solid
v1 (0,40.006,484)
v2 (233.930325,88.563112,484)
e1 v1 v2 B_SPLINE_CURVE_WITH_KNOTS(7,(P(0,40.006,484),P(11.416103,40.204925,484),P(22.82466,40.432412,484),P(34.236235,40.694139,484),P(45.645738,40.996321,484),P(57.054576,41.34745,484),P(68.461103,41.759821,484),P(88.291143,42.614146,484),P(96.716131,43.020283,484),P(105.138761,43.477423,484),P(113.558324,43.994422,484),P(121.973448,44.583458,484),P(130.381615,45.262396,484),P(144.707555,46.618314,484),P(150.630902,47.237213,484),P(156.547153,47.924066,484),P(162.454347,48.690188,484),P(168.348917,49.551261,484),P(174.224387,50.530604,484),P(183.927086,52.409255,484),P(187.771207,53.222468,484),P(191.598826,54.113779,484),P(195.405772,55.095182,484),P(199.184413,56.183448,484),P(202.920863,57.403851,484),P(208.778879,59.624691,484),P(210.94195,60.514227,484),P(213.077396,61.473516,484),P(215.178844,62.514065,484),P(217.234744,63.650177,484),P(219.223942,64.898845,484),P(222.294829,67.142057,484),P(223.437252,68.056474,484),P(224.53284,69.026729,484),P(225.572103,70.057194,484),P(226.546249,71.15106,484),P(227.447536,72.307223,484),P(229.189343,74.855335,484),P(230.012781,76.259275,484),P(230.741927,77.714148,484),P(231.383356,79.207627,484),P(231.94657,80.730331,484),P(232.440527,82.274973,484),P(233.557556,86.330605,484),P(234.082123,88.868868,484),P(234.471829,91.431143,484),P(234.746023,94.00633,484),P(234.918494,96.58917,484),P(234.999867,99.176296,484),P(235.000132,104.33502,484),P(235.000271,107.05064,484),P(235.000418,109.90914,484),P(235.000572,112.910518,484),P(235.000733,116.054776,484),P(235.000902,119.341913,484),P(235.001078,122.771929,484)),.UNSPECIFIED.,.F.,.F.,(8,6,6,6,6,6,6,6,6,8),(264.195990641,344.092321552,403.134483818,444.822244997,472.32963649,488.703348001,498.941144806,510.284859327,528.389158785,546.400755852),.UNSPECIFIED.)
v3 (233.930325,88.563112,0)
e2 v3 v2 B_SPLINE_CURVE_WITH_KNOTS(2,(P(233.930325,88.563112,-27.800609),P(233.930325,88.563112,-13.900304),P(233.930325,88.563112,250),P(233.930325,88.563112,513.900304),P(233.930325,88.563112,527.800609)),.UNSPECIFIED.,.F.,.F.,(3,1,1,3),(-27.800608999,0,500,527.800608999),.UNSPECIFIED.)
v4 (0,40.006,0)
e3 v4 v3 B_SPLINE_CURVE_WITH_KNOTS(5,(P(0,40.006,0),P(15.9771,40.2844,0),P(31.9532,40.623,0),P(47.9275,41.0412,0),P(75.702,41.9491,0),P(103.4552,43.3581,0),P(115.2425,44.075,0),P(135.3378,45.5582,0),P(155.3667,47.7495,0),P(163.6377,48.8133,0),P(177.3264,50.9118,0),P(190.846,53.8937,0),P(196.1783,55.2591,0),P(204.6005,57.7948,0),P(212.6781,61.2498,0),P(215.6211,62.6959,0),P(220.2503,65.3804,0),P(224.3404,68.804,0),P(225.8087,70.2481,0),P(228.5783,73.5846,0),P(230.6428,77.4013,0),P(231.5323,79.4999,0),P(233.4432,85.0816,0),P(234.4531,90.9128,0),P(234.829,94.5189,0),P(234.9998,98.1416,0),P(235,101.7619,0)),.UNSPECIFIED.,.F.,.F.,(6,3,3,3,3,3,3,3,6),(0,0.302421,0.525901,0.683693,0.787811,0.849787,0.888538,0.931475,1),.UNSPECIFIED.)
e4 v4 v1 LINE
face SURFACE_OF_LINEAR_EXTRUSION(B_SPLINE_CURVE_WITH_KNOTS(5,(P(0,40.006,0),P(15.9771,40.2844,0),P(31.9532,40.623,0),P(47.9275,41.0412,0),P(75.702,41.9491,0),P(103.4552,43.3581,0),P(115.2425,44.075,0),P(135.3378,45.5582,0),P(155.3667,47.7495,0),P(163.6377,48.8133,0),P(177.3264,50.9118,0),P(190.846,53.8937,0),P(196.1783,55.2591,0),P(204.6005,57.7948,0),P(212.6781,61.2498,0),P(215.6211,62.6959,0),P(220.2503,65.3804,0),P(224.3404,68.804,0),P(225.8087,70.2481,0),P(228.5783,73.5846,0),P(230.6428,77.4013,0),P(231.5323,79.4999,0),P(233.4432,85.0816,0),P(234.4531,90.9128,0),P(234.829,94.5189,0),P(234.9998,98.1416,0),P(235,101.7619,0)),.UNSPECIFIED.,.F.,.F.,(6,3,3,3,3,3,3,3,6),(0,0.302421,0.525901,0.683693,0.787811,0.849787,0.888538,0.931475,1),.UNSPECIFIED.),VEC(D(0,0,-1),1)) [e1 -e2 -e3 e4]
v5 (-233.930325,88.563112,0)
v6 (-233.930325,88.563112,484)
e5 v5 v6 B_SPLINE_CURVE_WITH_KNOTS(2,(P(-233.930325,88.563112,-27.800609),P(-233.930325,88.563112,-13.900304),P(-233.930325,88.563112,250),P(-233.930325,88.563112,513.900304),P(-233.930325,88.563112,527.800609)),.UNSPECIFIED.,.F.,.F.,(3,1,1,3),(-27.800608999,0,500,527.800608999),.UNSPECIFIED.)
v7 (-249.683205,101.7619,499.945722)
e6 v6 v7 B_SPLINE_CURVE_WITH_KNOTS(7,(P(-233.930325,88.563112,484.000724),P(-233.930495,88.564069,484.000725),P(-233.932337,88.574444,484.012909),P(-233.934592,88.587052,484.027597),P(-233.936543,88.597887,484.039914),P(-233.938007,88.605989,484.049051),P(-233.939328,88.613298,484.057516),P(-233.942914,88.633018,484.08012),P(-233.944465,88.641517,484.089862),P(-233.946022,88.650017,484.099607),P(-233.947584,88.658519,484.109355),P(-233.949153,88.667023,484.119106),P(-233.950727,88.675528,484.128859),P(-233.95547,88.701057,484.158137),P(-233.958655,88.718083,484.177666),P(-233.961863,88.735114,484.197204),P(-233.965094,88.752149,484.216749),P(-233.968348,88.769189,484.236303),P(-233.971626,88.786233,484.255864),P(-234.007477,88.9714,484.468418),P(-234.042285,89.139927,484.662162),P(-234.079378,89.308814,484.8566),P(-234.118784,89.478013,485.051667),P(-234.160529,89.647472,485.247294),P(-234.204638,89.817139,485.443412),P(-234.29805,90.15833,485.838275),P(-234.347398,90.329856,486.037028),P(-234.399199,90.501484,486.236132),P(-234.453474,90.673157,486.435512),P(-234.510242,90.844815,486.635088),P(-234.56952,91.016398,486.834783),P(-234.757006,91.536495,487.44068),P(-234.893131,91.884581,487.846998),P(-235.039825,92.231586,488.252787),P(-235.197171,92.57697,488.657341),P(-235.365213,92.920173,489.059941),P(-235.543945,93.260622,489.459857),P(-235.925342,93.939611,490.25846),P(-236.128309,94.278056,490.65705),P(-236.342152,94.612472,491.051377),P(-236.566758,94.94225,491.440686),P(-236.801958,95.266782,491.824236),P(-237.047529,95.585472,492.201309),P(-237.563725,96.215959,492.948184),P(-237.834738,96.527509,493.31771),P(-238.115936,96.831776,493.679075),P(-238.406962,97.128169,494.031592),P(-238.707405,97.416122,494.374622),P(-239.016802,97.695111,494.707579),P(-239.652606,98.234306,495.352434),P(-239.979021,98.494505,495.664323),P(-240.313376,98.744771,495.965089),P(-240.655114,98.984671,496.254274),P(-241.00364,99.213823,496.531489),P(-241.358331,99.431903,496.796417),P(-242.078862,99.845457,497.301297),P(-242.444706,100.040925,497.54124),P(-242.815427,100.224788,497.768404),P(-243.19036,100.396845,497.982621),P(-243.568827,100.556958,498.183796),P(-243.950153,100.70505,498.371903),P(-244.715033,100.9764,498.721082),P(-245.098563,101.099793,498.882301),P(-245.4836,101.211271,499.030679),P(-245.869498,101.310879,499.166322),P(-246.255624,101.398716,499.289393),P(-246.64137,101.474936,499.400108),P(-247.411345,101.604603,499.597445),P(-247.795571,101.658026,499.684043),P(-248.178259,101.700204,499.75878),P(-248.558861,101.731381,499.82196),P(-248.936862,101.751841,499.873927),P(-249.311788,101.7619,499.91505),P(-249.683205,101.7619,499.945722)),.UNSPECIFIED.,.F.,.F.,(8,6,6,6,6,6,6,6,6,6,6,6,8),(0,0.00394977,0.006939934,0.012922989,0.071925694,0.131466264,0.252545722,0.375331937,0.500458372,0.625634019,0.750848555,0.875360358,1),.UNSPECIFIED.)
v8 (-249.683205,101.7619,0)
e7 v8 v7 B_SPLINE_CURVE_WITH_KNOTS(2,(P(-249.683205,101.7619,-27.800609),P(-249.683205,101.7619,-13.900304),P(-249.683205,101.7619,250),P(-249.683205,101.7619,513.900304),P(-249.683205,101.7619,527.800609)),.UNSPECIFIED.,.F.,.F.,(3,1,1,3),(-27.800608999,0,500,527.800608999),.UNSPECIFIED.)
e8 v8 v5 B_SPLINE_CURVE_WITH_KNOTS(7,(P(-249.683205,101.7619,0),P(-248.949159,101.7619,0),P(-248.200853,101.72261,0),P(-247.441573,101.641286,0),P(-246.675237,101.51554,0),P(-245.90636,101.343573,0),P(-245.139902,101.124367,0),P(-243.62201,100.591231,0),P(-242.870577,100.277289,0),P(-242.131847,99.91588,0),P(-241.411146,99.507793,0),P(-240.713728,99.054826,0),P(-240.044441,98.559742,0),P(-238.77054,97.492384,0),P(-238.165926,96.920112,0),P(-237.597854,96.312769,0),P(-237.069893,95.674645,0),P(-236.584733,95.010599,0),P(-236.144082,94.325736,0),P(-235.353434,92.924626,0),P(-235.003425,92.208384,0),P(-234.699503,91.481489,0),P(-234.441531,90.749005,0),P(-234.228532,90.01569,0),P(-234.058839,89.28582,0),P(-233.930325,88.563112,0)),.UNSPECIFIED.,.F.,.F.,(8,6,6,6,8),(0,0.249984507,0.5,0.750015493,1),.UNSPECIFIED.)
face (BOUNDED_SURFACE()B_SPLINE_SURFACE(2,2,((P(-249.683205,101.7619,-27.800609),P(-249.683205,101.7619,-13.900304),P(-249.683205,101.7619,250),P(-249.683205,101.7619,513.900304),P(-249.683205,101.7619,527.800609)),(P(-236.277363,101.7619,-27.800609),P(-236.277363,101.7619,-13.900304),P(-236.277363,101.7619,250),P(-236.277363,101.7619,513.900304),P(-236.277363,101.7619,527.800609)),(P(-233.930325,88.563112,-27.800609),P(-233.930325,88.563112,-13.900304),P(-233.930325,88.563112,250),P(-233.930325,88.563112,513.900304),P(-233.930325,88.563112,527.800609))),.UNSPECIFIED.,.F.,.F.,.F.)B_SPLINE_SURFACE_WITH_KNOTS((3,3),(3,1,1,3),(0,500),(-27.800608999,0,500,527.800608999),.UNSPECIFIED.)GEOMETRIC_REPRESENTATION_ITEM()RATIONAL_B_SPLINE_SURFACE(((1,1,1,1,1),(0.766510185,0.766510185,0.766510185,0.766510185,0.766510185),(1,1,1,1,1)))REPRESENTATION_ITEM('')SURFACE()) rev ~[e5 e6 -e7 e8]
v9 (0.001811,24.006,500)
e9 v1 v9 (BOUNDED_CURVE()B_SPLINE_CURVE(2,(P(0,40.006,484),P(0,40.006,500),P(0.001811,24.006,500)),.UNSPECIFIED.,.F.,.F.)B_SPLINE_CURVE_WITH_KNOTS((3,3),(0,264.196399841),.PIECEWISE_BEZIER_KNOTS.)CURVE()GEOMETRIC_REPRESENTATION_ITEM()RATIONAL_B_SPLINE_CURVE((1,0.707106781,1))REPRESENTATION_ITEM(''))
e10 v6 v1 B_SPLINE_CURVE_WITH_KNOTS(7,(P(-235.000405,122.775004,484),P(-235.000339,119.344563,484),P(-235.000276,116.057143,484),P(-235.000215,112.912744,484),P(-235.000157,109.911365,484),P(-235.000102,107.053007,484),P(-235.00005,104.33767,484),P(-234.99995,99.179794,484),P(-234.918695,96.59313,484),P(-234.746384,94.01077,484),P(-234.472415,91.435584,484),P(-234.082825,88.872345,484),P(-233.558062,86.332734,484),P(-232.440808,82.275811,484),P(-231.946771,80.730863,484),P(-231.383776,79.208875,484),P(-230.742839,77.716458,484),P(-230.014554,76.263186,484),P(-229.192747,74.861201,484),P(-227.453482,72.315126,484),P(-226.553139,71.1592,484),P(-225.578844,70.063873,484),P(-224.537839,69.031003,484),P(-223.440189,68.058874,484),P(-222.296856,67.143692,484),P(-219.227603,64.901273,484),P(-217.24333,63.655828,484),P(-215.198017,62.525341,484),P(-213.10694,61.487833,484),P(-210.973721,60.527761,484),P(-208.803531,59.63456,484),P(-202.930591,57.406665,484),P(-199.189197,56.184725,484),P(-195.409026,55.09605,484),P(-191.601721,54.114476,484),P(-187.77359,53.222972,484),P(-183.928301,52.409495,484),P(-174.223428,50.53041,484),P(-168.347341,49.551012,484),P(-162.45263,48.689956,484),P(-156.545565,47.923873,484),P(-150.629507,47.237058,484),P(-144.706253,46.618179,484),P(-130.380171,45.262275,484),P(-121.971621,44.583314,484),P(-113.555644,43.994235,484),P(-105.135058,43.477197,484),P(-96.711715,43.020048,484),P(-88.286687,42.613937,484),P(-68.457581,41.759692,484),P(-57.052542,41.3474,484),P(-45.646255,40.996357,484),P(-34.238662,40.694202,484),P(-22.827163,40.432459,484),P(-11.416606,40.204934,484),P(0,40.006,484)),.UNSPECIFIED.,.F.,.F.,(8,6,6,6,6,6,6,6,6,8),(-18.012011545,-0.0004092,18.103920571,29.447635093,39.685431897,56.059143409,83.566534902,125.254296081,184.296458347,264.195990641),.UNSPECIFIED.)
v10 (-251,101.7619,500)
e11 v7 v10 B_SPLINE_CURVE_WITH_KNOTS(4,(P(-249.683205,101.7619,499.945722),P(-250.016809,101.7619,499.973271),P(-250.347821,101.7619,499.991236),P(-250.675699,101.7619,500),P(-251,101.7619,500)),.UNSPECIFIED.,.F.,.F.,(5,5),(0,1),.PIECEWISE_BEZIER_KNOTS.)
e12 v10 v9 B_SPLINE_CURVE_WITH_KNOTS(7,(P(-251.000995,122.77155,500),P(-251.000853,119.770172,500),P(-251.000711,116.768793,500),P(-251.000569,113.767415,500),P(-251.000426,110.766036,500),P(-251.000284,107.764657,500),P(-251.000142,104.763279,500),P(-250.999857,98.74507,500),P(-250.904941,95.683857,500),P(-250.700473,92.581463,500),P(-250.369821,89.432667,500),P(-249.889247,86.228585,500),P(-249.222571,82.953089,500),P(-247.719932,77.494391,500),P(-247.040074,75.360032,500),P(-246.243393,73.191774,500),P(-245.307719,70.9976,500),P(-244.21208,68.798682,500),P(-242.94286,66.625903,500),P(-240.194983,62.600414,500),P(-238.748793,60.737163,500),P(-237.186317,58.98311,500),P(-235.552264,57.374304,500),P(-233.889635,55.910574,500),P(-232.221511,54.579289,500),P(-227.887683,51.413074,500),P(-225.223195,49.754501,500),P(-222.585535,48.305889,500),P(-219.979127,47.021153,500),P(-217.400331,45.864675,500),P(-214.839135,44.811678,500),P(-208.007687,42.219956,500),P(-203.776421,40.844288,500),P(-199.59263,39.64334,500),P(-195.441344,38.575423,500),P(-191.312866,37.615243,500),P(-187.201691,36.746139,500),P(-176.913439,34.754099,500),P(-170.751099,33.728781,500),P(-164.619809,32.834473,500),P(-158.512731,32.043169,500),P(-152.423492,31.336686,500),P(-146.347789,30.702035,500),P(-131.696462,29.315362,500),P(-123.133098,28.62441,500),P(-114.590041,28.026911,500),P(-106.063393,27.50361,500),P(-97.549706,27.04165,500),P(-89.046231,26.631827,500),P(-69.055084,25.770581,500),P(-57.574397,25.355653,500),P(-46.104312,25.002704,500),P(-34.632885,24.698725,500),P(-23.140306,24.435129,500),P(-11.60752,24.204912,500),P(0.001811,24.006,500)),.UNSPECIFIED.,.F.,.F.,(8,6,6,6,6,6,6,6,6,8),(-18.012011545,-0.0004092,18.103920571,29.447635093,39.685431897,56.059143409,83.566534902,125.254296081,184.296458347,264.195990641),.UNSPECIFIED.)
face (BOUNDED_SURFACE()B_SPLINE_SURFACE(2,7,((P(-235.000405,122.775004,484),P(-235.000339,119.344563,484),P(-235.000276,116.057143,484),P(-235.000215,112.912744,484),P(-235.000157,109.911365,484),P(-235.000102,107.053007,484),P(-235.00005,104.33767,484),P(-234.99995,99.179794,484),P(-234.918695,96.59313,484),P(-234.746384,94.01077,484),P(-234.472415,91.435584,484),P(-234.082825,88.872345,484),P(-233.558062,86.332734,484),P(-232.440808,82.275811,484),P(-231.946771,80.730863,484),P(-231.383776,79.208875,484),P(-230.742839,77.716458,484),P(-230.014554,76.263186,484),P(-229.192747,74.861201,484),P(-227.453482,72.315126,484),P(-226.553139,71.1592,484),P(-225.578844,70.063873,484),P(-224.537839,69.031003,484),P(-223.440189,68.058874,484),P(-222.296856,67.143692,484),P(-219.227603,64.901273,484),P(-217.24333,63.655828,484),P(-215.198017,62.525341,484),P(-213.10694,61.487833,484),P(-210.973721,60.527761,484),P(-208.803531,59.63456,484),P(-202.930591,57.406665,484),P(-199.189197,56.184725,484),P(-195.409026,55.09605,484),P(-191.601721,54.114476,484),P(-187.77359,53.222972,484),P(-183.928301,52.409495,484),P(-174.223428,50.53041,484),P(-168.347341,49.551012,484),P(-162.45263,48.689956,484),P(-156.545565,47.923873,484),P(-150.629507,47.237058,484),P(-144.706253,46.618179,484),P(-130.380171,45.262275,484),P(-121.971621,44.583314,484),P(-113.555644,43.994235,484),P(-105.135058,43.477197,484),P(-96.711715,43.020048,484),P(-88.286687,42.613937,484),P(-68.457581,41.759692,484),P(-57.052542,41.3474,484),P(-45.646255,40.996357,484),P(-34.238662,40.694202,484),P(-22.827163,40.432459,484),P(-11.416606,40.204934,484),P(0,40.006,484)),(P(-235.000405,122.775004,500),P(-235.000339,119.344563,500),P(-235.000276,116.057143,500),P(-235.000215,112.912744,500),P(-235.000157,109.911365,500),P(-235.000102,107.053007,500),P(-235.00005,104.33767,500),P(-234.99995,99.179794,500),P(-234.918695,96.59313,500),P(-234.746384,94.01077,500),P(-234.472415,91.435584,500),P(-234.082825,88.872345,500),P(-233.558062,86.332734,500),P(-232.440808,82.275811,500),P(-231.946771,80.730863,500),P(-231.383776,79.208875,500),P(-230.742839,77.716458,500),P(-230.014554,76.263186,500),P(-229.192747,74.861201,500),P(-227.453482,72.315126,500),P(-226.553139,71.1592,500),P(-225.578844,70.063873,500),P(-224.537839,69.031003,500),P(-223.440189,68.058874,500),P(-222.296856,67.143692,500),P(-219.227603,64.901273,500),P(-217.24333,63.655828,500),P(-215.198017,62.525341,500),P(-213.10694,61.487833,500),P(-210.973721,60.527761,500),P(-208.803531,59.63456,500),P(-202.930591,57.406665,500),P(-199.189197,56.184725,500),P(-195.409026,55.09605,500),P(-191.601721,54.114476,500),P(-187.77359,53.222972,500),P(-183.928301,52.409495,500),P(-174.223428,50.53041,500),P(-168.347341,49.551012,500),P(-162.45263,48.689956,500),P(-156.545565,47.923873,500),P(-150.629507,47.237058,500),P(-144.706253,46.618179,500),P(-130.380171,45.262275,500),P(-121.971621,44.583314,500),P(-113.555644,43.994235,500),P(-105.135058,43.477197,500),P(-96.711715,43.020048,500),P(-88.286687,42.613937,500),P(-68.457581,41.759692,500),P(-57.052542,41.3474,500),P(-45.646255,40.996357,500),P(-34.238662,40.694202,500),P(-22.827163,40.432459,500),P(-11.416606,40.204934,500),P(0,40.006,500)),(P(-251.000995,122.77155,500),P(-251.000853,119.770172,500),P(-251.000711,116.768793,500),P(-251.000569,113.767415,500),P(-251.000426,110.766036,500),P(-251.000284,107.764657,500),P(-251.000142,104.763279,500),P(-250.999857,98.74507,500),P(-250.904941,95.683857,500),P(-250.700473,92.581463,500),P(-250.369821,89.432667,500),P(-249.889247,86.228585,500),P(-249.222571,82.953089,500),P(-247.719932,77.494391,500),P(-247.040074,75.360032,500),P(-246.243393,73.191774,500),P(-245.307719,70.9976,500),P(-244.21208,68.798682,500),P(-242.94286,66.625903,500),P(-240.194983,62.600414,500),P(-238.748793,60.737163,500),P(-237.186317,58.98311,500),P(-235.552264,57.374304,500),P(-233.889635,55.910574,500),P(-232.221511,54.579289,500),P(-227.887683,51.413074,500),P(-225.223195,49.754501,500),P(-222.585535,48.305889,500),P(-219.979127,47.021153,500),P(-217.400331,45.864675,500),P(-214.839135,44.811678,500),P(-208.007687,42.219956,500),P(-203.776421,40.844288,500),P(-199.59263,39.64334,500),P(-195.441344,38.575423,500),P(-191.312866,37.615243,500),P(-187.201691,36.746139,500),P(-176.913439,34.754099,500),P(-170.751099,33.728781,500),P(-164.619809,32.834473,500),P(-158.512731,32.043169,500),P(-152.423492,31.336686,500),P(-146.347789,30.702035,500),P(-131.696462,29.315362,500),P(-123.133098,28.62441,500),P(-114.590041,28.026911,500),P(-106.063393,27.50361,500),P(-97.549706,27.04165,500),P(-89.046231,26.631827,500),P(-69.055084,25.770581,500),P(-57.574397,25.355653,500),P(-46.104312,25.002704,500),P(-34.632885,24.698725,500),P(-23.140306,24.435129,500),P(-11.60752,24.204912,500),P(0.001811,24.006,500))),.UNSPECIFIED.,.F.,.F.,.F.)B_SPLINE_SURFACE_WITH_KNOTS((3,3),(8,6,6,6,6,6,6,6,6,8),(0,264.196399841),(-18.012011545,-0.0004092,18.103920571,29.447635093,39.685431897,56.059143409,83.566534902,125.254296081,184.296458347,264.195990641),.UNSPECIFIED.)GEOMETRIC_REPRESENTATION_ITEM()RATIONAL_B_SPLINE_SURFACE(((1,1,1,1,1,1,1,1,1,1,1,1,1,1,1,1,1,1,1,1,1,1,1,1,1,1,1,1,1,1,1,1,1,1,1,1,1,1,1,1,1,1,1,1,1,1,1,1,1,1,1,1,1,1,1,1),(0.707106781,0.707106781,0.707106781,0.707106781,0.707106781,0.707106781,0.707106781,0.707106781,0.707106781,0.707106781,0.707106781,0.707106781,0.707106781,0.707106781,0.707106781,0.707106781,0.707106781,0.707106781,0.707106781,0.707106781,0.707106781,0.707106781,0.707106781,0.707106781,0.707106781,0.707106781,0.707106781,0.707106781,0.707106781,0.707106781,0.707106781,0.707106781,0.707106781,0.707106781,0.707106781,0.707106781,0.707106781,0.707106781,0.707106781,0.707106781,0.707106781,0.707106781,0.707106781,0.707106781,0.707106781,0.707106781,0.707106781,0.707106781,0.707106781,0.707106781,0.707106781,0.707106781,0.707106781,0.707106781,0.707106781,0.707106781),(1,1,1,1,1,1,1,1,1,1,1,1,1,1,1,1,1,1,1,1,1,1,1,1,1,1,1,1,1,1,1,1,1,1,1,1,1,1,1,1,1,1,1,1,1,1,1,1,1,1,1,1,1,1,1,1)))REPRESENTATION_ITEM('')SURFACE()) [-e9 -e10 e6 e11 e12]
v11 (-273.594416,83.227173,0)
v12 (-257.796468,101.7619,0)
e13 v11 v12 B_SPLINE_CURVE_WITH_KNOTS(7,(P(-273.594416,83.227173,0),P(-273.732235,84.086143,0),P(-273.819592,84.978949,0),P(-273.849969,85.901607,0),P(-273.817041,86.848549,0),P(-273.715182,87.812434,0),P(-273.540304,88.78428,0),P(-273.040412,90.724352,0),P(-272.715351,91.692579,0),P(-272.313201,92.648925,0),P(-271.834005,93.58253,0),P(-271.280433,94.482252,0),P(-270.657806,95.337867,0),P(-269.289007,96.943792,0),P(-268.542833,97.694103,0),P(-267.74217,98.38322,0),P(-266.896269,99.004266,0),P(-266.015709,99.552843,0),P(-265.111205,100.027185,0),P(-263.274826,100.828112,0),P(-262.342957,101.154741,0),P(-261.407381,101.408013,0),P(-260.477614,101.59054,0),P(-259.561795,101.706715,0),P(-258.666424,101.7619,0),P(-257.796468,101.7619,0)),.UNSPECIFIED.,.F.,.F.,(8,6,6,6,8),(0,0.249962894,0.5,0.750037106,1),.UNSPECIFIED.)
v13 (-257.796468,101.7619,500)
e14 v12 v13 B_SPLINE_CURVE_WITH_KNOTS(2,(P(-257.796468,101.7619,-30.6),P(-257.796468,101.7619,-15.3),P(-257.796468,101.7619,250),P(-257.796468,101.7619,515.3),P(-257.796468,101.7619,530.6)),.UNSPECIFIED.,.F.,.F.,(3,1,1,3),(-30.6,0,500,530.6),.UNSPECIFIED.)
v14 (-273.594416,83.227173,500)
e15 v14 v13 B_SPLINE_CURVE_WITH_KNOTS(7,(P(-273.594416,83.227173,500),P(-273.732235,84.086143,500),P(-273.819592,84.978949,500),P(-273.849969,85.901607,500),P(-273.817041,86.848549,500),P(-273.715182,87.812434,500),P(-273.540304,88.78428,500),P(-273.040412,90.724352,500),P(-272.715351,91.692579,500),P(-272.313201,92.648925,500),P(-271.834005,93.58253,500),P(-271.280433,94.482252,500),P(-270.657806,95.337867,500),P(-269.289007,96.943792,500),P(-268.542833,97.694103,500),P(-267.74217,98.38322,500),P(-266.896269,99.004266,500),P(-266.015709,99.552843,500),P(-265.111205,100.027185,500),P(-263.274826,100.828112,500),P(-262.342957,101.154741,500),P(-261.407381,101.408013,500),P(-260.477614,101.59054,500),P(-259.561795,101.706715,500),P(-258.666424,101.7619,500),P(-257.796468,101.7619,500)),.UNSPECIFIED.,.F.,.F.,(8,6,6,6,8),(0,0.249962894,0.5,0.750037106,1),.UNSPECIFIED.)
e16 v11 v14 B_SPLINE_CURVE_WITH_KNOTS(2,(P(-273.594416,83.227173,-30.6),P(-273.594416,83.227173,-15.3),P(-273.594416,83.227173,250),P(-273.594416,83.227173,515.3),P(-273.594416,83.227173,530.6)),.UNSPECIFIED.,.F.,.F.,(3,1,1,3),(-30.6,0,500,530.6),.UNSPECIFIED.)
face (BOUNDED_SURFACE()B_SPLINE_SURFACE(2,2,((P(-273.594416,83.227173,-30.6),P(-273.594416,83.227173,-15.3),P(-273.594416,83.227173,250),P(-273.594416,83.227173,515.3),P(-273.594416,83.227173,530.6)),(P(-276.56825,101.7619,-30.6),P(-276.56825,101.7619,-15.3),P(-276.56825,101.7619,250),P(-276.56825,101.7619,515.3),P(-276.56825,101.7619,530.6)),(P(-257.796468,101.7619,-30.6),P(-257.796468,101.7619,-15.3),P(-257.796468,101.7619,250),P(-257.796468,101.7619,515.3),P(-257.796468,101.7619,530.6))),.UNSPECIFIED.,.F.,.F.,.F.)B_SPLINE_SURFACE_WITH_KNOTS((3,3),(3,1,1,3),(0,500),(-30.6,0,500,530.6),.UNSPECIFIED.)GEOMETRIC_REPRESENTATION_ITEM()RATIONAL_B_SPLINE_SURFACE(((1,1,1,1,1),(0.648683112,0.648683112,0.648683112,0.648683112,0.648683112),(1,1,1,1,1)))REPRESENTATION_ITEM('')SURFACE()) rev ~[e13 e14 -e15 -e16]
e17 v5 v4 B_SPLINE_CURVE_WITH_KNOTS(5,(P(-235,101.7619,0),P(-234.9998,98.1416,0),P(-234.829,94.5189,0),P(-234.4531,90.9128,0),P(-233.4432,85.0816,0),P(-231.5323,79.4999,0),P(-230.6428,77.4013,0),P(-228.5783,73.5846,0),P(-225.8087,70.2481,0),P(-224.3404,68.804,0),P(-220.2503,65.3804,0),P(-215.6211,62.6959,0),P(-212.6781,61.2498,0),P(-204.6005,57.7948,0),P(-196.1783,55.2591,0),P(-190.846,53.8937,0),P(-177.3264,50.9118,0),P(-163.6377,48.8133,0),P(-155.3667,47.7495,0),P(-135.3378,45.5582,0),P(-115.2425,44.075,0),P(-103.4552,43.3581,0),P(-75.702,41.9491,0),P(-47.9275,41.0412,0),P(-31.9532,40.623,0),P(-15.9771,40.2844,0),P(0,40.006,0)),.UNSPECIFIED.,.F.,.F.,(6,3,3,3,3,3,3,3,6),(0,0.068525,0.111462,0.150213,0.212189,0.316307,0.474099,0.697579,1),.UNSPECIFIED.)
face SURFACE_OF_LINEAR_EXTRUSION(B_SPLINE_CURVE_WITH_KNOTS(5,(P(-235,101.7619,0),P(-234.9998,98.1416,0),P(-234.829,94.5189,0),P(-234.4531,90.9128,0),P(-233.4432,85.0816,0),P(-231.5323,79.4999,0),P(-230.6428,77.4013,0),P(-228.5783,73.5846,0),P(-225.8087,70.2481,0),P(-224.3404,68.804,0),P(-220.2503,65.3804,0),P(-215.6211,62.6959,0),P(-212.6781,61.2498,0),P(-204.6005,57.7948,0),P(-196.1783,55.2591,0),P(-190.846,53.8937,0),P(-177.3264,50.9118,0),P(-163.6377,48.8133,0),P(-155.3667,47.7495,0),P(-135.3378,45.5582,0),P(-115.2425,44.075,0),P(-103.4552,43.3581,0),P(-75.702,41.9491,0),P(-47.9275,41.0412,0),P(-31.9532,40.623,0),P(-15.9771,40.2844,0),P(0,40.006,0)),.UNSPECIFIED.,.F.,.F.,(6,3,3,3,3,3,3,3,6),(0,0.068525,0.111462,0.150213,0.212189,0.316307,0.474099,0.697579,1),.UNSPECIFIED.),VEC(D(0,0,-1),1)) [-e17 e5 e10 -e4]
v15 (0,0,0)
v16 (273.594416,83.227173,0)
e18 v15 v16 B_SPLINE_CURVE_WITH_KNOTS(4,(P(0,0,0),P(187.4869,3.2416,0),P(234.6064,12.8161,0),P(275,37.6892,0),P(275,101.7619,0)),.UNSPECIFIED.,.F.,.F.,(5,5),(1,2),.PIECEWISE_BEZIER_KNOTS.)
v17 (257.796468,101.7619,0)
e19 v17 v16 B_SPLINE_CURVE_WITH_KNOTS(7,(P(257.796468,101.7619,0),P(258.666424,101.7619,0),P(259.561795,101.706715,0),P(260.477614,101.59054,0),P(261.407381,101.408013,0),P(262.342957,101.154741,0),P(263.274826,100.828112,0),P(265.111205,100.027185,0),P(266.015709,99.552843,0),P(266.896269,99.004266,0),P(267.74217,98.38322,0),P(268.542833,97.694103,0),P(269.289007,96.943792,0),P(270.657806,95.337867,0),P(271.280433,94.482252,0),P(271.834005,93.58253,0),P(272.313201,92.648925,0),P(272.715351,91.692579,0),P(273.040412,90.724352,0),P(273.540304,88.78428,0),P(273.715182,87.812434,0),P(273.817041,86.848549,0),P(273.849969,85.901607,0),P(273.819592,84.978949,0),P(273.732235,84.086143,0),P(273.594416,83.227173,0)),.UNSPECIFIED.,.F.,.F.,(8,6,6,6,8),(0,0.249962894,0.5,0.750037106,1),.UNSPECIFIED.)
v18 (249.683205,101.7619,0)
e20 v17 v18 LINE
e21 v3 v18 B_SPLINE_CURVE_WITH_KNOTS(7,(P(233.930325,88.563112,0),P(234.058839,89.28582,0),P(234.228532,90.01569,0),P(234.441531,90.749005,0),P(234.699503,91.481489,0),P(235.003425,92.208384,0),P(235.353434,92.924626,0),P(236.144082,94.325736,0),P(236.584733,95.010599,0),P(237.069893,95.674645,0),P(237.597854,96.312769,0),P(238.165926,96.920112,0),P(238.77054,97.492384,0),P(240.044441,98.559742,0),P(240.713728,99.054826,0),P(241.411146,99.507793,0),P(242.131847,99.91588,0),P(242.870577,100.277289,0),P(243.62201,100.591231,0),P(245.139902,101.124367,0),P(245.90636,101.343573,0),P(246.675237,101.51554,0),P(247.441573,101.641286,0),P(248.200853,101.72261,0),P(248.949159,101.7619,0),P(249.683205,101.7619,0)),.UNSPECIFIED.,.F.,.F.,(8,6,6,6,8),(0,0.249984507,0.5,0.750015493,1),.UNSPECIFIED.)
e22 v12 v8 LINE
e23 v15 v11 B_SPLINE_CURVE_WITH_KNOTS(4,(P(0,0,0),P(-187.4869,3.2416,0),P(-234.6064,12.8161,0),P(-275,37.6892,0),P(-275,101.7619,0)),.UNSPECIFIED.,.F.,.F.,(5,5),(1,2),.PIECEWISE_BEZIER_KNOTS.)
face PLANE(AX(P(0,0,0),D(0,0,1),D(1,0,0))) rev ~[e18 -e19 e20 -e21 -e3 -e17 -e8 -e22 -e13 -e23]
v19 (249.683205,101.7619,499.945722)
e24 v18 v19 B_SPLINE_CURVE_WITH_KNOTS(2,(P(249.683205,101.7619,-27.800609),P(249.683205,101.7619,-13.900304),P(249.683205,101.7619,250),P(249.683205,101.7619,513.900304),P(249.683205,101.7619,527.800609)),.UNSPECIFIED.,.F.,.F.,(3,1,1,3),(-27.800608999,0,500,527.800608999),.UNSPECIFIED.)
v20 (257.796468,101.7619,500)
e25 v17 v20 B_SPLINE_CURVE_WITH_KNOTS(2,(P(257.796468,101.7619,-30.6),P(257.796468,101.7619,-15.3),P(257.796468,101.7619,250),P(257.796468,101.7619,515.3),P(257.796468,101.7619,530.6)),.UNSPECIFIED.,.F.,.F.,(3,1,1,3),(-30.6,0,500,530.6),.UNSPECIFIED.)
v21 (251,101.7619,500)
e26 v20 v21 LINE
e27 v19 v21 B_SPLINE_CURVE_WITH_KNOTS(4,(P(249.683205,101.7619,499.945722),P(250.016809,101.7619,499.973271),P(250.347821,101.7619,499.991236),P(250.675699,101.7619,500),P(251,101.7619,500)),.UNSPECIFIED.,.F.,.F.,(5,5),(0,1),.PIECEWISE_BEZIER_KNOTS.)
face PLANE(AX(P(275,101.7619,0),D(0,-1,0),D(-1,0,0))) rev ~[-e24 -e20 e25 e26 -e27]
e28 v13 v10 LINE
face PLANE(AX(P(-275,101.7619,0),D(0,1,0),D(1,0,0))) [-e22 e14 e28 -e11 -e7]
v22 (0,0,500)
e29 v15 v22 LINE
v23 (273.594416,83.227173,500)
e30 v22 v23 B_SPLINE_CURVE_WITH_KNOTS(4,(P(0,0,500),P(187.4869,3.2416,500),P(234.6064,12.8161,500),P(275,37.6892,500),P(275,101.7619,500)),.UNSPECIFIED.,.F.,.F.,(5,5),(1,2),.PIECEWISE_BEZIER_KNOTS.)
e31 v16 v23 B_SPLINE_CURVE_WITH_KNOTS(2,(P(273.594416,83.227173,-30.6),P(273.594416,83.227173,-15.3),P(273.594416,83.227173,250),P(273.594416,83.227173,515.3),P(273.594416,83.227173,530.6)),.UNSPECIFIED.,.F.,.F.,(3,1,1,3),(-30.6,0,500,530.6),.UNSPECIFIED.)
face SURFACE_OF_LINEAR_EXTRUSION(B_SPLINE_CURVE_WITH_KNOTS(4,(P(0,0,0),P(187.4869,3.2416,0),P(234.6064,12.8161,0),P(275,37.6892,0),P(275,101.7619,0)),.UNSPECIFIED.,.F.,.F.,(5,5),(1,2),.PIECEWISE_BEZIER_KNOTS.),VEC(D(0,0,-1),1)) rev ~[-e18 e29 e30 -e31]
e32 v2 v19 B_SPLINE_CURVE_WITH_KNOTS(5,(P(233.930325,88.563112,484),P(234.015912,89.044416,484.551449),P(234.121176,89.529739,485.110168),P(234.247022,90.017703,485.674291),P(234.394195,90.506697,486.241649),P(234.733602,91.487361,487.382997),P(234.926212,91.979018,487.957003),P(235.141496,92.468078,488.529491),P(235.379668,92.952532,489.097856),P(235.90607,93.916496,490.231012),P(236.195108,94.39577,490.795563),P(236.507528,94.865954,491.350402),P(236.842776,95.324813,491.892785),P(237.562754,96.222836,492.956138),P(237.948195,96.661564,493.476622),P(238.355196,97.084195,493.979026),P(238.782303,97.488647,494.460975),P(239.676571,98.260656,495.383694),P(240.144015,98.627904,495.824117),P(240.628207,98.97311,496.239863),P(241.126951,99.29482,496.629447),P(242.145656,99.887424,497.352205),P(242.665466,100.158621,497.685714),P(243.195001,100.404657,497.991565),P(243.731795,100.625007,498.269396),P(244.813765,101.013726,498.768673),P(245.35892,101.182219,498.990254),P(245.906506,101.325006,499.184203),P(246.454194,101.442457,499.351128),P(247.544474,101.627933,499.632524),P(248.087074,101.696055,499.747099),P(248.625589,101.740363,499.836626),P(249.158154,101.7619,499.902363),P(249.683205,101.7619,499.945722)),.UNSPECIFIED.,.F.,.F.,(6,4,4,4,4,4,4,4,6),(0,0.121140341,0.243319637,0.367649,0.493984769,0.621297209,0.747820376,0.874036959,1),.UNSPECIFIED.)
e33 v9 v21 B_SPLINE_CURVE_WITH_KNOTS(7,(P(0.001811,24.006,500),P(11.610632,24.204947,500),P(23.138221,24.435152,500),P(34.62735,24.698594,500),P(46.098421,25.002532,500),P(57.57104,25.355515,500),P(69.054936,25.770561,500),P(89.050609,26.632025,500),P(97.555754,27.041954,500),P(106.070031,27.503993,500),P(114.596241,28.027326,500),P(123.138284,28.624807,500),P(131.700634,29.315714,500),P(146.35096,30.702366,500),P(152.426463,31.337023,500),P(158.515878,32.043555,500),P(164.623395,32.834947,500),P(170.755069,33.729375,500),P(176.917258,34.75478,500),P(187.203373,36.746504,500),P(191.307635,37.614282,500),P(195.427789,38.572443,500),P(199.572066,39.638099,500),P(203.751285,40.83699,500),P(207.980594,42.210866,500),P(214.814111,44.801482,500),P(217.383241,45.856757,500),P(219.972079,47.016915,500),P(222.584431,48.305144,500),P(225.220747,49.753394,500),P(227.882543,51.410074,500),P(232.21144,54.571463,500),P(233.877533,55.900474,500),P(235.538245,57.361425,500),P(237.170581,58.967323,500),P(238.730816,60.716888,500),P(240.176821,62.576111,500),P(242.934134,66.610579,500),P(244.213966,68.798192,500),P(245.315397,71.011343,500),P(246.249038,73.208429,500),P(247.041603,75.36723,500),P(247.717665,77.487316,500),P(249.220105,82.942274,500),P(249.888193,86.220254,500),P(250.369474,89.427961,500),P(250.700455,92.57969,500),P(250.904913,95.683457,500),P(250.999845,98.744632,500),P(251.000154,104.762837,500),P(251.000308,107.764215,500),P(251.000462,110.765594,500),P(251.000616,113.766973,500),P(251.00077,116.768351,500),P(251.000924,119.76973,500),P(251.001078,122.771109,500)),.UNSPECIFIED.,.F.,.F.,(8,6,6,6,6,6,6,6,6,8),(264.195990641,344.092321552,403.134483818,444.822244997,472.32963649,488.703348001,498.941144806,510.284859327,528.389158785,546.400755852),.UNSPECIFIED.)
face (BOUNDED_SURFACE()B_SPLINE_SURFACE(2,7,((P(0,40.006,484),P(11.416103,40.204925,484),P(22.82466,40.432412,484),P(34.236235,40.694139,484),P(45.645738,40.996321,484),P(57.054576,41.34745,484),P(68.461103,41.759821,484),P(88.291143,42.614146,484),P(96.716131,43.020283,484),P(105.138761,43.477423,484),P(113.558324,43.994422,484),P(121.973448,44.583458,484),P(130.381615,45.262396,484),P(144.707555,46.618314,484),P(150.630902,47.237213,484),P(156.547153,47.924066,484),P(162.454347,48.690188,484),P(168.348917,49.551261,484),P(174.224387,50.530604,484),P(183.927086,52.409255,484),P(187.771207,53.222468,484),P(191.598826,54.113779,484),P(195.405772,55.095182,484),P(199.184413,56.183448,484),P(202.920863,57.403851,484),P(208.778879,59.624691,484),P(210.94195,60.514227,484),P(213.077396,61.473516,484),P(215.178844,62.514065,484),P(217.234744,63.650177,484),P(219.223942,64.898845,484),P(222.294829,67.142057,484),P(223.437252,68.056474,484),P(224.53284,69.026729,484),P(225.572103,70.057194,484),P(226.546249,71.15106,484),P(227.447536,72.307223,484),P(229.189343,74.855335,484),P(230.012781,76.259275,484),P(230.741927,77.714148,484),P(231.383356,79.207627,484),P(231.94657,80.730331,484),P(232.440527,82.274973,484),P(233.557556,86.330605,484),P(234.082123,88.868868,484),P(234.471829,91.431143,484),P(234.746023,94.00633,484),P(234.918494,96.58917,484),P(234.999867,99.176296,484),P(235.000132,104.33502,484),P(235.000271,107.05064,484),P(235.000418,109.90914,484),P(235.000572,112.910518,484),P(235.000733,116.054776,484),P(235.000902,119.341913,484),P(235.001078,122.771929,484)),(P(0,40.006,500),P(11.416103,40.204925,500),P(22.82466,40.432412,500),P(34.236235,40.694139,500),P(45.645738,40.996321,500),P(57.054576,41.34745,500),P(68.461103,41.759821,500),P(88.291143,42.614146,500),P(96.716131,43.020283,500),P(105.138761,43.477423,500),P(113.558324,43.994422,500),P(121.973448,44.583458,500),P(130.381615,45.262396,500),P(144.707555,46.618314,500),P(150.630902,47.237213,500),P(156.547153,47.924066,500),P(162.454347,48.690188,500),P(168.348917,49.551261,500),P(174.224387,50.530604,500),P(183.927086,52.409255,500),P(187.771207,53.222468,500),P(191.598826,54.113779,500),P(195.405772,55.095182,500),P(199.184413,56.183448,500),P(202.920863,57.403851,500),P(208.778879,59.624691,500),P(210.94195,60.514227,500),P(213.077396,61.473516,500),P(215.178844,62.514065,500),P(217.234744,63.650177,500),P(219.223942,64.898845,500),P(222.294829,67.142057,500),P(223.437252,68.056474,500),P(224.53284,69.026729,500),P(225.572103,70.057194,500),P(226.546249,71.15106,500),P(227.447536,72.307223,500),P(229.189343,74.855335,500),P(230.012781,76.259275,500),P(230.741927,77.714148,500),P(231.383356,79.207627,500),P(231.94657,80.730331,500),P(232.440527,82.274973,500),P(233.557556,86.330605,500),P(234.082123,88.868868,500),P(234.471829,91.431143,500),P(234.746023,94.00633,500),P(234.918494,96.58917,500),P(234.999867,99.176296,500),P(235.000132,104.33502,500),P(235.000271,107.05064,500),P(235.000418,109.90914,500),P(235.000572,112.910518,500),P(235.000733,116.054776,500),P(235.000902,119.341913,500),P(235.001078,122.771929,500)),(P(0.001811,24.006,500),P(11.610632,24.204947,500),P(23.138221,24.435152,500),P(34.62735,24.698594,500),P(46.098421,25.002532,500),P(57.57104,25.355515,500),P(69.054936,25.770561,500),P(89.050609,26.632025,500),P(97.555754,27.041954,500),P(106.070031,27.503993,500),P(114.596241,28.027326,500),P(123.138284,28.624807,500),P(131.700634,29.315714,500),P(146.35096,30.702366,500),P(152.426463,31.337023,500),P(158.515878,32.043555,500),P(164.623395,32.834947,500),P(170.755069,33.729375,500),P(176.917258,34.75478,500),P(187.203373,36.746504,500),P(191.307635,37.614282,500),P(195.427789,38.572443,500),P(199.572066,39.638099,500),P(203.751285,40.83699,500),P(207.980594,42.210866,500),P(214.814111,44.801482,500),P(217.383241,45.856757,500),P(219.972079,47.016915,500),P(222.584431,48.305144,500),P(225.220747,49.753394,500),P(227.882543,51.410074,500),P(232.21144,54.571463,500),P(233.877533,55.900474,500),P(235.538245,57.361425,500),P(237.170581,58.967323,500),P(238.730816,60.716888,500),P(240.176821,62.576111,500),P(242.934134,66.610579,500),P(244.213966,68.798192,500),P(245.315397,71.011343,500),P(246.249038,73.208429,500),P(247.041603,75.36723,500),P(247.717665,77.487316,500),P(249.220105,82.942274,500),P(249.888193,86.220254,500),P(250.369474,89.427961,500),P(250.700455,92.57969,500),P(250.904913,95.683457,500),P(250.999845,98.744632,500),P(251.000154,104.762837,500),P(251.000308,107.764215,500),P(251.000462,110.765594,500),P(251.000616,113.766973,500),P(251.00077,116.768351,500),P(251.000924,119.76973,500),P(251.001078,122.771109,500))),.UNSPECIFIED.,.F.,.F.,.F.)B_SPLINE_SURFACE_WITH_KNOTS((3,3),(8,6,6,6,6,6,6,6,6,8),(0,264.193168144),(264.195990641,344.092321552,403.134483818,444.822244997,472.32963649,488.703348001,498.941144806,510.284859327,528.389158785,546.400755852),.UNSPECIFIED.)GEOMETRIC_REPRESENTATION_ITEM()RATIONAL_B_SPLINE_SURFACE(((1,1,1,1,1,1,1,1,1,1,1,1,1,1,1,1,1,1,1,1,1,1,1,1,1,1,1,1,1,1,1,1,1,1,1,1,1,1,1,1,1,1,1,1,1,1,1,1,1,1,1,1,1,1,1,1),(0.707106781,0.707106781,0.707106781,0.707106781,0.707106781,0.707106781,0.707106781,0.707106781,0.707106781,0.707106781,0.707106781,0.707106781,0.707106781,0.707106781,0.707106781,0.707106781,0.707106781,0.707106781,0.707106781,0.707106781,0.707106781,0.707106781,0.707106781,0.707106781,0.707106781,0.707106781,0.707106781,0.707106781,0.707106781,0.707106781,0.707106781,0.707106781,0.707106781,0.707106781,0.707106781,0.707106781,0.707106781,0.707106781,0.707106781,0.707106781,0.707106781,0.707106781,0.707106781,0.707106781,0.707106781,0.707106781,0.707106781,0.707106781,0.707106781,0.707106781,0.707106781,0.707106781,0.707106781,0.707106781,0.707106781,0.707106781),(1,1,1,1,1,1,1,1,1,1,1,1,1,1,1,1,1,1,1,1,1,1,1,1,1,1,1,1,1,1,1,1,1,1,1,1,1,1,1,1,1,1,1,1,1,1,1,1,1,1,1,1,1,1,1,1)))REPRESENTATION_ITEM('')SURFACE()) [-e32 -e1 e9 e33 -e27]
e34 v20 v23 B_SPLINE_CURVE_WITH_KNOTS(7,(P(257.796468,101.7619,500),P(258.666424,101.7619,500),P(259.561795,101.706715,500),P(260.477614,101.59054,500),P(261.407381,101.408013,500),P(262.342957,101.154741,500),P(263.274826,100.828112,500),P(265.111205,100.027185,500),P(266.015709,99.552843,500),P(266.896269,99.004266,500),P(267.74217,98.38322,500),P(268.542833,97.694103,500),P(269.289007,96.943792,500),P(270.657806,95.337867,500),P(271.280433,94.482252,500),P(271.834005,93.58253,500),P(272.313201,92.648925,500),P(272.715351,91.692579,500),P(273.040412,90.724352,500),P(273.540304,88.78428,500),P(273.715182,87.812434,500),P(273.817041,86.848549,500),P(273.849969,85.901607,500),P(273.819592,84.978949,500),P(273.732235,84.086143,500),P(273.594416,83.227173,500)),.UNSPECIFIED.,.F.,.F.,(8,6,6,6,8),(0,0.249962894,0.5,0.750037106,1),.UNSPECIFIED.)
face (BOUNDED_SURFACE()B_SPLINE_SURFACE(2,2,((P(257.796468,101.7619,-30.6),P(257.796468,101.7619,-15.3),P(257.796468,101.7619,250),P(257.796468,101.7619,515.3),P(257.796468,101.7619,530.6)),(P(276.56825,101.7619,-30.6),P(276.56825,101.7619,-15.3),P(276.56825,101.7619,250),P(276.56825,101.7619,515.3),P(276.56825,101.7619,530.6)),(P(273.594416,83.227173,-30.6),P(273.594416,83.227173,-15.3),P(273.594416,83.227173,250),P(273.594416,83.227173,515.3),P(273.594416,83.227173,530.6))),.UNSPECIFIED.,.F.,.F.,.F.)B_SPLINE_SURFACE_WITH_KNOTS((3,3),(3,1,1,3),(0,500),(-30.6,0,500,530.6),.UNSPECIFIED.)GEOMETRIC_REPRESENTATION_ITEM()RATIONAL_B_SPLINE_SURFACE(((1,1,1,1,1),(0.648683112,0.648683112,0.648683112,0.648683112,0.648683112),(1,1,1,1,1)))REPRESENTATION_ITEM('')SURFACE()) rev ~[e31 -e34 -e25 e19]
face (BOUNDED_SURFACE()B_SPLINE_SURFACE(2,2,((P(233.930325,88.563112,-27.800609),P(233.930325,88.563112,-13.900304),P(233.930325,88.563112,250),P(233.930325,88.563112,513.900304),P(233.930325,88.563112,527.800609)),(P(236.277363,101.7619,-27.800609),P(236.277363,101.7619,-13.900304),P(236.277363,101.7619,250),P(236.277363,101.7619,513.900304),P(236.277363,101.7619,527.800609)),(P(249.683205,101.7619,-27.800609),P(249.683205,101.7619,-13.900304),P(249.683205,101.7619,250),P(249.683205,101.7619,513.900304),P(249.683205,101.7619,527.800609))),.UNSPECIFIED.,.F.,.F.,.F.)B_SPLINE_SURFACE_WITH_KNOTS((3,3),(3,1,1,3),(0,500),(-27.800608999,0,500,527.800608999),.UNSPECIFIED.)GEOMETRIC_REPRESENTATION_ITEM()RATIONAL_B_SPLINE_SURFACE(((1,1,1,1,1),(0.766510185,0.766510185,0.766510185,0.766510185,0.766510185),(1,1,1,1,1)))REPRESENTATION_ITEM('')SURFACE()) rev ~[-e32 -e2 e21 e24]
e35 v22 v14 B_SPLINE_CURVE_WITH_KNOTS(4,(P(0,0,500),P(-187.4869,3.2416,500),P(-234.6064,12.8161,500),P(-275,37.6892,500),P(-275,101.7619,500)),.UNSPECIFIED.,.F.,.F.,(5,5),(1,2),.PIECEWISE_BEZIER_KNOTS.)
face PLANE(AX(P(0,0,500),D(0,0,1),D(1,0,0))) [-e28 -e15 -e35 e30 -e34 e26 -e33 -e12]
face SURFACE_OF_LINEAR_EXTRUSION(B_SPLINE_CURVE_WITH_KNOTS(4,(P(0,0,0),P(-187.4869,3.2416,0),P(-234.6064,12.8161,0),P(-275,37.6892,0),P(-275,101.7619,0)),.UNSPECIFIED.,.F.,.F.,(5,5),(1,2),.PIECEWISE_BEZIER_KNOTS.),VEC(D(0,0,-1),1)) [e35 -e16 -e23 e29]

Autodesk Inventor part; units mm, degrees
ref_plane "YZ Plane" through (0, 0, 0) normal (1, 0, 0) x (0, 1, 0)
ref_plane "XZ Plane" through (0, 0, 0) normal (0, 1, 0) x (-1, 0, 0)
ref_plane "XY Plane" through (0, 0, 0) normal (0, 0, 1) x (1, 0, 0)
sketch "Sketch1" plane through (0, 0, 0) normal (0, 0, 1) x (1, 0, 0)
  line L0 (0, 0) -> (-187.4869, 3.2416) construction
  line L1 (-187.4869, 3.2416) -> (-234.6064, 12.8161) construction
  line L2 (-234.6064, 12.8161) -> (-275, 37.6892) construction
  line L3 (-275, 37.6892) -> (-275, 101.7619) construction
  spline S0 degree 4 poles (0, 0) (-187.4869, 3.2416) (-234.6064, 12.8161) (-275, 37.6892) (-275, 101.7619) knots 1 1 1 1 1 2 2 2 2 2
  line L4 (0, 0) -> (0, 113.2924) construction
  line L5 (0, 0) -> (187.4869, 3.2416) construction
  line L6 (187.4869, 3.2416) -> (234.6064, 12.8161) construction
  line L7 (234.6064, 12.8161) -> (275, 37.6892) construction
  line L8 (275, 37.6892) -> (275, 101.7619) construction
  spline S1 degree 4 poles (0, 0) (187.4869, 3.2416) (234.6064, 12.8161) (275, 37.6892) (275, 101.7619) knots 1 1 1 1 1 2 2 2 2 2
  line L9 (-275, 101.7619) -> (-235, 101.7619)
  line L10 (275, 101.7619) -> (235, 101.7619)
  spline S2 degree 5 poles (-235, 101.7619) (-234.9998, 98.1416) (-234.829, 94.5189) (-234.4531, 90.9128) (-233.4432, 85.0816) (-231.5323, 79.4999) (-230.6428, 77.4013) (-228.5783, 73.5846) (-225.8087, 70.2481) (-224.3404, 68.804) (-220.2503, 65.3804) (-215.6211, 62.6959) (-212.6781, 61.2498) (-204.6005, 57.7948) (-196.1783, 55.2591) (-190.846, 53.8937) (-177.3264, 50.9118) (-163.6377, 48.8133) (-155.3667, 47.7495) (-135.3378, 45.5582) (-115.2425, 44.075) (-103.4552, 43.3581) (-75.702, 41.9491) (-47.9275, 41.0412) (-31.9532, 40.623) (-15.9771, 40.2844) (0, 40.006) knots 0 0 0 0 0 0 0.068525 0.068525 0.068525 0.111462 0.111462 0.111462 0.150213 0.150213 0.150213 0.212189 0.212189 0.212189 0.316307 0.316307 0.316307 0.474099 0.474099 0.474099 0.697579 0.697579 0.697579 1 1 1 1 1 1
  spline S3 degree 5 poles (0, 40.006) (15.9771, 40.2844) (31.9532, 40.623) (47.9275, 41.0412) (75.702, 41.9491) (103.4552, 43.3581) (115.2425, 44.075) (135.3378, 45.5582) (155.3667, 47.7495) (163.6377, 48.8133) (177.3264, 50.9118) (190.846, 53.8937) (196.1783, 55.2591) (204.6005, 57.7948) (212.6781, 61.2498) (215.6211, 62.6959) (220.2503, 65.3804) (224.3404, 68.804) (225.8087, 70.2481) (228.5783, 73.5846) (230.6428, 77.4013) (231.5323, 79.4999) (233.4432, 85.0816) (234.4531, 90.9128) (234.829, 94.5189) (234.9998, 98.1416) (235, 101.7619) knots 0 0 0 0 0 0 0.302421 0.302421 0.302421 0.525901 0.525901 0.525901 0.683693 0.683693 0.683693 0.787811 0.787811 0.787811 0.849787 0.849787 0.849787 0.888538 0.888538 0.888538 0.931475 0.931475 0.931475 1 1 1 1 1 1
  dimension "d3" = 40
  dimension "d0" = 275
extrude "Extrusion1" add sketch "Sketch1" along normal blind 500
fillet "Fillet1" radius 16 6 edges at (-275, 101.7619, 250) (-235, 101.7619, 250) (235, 101.7619, 250) (275, 101.7619, 250) (-131.9618, 45.4436, 500) (131.9618, 45.4436, 500)
properties part number "SeatBase"
